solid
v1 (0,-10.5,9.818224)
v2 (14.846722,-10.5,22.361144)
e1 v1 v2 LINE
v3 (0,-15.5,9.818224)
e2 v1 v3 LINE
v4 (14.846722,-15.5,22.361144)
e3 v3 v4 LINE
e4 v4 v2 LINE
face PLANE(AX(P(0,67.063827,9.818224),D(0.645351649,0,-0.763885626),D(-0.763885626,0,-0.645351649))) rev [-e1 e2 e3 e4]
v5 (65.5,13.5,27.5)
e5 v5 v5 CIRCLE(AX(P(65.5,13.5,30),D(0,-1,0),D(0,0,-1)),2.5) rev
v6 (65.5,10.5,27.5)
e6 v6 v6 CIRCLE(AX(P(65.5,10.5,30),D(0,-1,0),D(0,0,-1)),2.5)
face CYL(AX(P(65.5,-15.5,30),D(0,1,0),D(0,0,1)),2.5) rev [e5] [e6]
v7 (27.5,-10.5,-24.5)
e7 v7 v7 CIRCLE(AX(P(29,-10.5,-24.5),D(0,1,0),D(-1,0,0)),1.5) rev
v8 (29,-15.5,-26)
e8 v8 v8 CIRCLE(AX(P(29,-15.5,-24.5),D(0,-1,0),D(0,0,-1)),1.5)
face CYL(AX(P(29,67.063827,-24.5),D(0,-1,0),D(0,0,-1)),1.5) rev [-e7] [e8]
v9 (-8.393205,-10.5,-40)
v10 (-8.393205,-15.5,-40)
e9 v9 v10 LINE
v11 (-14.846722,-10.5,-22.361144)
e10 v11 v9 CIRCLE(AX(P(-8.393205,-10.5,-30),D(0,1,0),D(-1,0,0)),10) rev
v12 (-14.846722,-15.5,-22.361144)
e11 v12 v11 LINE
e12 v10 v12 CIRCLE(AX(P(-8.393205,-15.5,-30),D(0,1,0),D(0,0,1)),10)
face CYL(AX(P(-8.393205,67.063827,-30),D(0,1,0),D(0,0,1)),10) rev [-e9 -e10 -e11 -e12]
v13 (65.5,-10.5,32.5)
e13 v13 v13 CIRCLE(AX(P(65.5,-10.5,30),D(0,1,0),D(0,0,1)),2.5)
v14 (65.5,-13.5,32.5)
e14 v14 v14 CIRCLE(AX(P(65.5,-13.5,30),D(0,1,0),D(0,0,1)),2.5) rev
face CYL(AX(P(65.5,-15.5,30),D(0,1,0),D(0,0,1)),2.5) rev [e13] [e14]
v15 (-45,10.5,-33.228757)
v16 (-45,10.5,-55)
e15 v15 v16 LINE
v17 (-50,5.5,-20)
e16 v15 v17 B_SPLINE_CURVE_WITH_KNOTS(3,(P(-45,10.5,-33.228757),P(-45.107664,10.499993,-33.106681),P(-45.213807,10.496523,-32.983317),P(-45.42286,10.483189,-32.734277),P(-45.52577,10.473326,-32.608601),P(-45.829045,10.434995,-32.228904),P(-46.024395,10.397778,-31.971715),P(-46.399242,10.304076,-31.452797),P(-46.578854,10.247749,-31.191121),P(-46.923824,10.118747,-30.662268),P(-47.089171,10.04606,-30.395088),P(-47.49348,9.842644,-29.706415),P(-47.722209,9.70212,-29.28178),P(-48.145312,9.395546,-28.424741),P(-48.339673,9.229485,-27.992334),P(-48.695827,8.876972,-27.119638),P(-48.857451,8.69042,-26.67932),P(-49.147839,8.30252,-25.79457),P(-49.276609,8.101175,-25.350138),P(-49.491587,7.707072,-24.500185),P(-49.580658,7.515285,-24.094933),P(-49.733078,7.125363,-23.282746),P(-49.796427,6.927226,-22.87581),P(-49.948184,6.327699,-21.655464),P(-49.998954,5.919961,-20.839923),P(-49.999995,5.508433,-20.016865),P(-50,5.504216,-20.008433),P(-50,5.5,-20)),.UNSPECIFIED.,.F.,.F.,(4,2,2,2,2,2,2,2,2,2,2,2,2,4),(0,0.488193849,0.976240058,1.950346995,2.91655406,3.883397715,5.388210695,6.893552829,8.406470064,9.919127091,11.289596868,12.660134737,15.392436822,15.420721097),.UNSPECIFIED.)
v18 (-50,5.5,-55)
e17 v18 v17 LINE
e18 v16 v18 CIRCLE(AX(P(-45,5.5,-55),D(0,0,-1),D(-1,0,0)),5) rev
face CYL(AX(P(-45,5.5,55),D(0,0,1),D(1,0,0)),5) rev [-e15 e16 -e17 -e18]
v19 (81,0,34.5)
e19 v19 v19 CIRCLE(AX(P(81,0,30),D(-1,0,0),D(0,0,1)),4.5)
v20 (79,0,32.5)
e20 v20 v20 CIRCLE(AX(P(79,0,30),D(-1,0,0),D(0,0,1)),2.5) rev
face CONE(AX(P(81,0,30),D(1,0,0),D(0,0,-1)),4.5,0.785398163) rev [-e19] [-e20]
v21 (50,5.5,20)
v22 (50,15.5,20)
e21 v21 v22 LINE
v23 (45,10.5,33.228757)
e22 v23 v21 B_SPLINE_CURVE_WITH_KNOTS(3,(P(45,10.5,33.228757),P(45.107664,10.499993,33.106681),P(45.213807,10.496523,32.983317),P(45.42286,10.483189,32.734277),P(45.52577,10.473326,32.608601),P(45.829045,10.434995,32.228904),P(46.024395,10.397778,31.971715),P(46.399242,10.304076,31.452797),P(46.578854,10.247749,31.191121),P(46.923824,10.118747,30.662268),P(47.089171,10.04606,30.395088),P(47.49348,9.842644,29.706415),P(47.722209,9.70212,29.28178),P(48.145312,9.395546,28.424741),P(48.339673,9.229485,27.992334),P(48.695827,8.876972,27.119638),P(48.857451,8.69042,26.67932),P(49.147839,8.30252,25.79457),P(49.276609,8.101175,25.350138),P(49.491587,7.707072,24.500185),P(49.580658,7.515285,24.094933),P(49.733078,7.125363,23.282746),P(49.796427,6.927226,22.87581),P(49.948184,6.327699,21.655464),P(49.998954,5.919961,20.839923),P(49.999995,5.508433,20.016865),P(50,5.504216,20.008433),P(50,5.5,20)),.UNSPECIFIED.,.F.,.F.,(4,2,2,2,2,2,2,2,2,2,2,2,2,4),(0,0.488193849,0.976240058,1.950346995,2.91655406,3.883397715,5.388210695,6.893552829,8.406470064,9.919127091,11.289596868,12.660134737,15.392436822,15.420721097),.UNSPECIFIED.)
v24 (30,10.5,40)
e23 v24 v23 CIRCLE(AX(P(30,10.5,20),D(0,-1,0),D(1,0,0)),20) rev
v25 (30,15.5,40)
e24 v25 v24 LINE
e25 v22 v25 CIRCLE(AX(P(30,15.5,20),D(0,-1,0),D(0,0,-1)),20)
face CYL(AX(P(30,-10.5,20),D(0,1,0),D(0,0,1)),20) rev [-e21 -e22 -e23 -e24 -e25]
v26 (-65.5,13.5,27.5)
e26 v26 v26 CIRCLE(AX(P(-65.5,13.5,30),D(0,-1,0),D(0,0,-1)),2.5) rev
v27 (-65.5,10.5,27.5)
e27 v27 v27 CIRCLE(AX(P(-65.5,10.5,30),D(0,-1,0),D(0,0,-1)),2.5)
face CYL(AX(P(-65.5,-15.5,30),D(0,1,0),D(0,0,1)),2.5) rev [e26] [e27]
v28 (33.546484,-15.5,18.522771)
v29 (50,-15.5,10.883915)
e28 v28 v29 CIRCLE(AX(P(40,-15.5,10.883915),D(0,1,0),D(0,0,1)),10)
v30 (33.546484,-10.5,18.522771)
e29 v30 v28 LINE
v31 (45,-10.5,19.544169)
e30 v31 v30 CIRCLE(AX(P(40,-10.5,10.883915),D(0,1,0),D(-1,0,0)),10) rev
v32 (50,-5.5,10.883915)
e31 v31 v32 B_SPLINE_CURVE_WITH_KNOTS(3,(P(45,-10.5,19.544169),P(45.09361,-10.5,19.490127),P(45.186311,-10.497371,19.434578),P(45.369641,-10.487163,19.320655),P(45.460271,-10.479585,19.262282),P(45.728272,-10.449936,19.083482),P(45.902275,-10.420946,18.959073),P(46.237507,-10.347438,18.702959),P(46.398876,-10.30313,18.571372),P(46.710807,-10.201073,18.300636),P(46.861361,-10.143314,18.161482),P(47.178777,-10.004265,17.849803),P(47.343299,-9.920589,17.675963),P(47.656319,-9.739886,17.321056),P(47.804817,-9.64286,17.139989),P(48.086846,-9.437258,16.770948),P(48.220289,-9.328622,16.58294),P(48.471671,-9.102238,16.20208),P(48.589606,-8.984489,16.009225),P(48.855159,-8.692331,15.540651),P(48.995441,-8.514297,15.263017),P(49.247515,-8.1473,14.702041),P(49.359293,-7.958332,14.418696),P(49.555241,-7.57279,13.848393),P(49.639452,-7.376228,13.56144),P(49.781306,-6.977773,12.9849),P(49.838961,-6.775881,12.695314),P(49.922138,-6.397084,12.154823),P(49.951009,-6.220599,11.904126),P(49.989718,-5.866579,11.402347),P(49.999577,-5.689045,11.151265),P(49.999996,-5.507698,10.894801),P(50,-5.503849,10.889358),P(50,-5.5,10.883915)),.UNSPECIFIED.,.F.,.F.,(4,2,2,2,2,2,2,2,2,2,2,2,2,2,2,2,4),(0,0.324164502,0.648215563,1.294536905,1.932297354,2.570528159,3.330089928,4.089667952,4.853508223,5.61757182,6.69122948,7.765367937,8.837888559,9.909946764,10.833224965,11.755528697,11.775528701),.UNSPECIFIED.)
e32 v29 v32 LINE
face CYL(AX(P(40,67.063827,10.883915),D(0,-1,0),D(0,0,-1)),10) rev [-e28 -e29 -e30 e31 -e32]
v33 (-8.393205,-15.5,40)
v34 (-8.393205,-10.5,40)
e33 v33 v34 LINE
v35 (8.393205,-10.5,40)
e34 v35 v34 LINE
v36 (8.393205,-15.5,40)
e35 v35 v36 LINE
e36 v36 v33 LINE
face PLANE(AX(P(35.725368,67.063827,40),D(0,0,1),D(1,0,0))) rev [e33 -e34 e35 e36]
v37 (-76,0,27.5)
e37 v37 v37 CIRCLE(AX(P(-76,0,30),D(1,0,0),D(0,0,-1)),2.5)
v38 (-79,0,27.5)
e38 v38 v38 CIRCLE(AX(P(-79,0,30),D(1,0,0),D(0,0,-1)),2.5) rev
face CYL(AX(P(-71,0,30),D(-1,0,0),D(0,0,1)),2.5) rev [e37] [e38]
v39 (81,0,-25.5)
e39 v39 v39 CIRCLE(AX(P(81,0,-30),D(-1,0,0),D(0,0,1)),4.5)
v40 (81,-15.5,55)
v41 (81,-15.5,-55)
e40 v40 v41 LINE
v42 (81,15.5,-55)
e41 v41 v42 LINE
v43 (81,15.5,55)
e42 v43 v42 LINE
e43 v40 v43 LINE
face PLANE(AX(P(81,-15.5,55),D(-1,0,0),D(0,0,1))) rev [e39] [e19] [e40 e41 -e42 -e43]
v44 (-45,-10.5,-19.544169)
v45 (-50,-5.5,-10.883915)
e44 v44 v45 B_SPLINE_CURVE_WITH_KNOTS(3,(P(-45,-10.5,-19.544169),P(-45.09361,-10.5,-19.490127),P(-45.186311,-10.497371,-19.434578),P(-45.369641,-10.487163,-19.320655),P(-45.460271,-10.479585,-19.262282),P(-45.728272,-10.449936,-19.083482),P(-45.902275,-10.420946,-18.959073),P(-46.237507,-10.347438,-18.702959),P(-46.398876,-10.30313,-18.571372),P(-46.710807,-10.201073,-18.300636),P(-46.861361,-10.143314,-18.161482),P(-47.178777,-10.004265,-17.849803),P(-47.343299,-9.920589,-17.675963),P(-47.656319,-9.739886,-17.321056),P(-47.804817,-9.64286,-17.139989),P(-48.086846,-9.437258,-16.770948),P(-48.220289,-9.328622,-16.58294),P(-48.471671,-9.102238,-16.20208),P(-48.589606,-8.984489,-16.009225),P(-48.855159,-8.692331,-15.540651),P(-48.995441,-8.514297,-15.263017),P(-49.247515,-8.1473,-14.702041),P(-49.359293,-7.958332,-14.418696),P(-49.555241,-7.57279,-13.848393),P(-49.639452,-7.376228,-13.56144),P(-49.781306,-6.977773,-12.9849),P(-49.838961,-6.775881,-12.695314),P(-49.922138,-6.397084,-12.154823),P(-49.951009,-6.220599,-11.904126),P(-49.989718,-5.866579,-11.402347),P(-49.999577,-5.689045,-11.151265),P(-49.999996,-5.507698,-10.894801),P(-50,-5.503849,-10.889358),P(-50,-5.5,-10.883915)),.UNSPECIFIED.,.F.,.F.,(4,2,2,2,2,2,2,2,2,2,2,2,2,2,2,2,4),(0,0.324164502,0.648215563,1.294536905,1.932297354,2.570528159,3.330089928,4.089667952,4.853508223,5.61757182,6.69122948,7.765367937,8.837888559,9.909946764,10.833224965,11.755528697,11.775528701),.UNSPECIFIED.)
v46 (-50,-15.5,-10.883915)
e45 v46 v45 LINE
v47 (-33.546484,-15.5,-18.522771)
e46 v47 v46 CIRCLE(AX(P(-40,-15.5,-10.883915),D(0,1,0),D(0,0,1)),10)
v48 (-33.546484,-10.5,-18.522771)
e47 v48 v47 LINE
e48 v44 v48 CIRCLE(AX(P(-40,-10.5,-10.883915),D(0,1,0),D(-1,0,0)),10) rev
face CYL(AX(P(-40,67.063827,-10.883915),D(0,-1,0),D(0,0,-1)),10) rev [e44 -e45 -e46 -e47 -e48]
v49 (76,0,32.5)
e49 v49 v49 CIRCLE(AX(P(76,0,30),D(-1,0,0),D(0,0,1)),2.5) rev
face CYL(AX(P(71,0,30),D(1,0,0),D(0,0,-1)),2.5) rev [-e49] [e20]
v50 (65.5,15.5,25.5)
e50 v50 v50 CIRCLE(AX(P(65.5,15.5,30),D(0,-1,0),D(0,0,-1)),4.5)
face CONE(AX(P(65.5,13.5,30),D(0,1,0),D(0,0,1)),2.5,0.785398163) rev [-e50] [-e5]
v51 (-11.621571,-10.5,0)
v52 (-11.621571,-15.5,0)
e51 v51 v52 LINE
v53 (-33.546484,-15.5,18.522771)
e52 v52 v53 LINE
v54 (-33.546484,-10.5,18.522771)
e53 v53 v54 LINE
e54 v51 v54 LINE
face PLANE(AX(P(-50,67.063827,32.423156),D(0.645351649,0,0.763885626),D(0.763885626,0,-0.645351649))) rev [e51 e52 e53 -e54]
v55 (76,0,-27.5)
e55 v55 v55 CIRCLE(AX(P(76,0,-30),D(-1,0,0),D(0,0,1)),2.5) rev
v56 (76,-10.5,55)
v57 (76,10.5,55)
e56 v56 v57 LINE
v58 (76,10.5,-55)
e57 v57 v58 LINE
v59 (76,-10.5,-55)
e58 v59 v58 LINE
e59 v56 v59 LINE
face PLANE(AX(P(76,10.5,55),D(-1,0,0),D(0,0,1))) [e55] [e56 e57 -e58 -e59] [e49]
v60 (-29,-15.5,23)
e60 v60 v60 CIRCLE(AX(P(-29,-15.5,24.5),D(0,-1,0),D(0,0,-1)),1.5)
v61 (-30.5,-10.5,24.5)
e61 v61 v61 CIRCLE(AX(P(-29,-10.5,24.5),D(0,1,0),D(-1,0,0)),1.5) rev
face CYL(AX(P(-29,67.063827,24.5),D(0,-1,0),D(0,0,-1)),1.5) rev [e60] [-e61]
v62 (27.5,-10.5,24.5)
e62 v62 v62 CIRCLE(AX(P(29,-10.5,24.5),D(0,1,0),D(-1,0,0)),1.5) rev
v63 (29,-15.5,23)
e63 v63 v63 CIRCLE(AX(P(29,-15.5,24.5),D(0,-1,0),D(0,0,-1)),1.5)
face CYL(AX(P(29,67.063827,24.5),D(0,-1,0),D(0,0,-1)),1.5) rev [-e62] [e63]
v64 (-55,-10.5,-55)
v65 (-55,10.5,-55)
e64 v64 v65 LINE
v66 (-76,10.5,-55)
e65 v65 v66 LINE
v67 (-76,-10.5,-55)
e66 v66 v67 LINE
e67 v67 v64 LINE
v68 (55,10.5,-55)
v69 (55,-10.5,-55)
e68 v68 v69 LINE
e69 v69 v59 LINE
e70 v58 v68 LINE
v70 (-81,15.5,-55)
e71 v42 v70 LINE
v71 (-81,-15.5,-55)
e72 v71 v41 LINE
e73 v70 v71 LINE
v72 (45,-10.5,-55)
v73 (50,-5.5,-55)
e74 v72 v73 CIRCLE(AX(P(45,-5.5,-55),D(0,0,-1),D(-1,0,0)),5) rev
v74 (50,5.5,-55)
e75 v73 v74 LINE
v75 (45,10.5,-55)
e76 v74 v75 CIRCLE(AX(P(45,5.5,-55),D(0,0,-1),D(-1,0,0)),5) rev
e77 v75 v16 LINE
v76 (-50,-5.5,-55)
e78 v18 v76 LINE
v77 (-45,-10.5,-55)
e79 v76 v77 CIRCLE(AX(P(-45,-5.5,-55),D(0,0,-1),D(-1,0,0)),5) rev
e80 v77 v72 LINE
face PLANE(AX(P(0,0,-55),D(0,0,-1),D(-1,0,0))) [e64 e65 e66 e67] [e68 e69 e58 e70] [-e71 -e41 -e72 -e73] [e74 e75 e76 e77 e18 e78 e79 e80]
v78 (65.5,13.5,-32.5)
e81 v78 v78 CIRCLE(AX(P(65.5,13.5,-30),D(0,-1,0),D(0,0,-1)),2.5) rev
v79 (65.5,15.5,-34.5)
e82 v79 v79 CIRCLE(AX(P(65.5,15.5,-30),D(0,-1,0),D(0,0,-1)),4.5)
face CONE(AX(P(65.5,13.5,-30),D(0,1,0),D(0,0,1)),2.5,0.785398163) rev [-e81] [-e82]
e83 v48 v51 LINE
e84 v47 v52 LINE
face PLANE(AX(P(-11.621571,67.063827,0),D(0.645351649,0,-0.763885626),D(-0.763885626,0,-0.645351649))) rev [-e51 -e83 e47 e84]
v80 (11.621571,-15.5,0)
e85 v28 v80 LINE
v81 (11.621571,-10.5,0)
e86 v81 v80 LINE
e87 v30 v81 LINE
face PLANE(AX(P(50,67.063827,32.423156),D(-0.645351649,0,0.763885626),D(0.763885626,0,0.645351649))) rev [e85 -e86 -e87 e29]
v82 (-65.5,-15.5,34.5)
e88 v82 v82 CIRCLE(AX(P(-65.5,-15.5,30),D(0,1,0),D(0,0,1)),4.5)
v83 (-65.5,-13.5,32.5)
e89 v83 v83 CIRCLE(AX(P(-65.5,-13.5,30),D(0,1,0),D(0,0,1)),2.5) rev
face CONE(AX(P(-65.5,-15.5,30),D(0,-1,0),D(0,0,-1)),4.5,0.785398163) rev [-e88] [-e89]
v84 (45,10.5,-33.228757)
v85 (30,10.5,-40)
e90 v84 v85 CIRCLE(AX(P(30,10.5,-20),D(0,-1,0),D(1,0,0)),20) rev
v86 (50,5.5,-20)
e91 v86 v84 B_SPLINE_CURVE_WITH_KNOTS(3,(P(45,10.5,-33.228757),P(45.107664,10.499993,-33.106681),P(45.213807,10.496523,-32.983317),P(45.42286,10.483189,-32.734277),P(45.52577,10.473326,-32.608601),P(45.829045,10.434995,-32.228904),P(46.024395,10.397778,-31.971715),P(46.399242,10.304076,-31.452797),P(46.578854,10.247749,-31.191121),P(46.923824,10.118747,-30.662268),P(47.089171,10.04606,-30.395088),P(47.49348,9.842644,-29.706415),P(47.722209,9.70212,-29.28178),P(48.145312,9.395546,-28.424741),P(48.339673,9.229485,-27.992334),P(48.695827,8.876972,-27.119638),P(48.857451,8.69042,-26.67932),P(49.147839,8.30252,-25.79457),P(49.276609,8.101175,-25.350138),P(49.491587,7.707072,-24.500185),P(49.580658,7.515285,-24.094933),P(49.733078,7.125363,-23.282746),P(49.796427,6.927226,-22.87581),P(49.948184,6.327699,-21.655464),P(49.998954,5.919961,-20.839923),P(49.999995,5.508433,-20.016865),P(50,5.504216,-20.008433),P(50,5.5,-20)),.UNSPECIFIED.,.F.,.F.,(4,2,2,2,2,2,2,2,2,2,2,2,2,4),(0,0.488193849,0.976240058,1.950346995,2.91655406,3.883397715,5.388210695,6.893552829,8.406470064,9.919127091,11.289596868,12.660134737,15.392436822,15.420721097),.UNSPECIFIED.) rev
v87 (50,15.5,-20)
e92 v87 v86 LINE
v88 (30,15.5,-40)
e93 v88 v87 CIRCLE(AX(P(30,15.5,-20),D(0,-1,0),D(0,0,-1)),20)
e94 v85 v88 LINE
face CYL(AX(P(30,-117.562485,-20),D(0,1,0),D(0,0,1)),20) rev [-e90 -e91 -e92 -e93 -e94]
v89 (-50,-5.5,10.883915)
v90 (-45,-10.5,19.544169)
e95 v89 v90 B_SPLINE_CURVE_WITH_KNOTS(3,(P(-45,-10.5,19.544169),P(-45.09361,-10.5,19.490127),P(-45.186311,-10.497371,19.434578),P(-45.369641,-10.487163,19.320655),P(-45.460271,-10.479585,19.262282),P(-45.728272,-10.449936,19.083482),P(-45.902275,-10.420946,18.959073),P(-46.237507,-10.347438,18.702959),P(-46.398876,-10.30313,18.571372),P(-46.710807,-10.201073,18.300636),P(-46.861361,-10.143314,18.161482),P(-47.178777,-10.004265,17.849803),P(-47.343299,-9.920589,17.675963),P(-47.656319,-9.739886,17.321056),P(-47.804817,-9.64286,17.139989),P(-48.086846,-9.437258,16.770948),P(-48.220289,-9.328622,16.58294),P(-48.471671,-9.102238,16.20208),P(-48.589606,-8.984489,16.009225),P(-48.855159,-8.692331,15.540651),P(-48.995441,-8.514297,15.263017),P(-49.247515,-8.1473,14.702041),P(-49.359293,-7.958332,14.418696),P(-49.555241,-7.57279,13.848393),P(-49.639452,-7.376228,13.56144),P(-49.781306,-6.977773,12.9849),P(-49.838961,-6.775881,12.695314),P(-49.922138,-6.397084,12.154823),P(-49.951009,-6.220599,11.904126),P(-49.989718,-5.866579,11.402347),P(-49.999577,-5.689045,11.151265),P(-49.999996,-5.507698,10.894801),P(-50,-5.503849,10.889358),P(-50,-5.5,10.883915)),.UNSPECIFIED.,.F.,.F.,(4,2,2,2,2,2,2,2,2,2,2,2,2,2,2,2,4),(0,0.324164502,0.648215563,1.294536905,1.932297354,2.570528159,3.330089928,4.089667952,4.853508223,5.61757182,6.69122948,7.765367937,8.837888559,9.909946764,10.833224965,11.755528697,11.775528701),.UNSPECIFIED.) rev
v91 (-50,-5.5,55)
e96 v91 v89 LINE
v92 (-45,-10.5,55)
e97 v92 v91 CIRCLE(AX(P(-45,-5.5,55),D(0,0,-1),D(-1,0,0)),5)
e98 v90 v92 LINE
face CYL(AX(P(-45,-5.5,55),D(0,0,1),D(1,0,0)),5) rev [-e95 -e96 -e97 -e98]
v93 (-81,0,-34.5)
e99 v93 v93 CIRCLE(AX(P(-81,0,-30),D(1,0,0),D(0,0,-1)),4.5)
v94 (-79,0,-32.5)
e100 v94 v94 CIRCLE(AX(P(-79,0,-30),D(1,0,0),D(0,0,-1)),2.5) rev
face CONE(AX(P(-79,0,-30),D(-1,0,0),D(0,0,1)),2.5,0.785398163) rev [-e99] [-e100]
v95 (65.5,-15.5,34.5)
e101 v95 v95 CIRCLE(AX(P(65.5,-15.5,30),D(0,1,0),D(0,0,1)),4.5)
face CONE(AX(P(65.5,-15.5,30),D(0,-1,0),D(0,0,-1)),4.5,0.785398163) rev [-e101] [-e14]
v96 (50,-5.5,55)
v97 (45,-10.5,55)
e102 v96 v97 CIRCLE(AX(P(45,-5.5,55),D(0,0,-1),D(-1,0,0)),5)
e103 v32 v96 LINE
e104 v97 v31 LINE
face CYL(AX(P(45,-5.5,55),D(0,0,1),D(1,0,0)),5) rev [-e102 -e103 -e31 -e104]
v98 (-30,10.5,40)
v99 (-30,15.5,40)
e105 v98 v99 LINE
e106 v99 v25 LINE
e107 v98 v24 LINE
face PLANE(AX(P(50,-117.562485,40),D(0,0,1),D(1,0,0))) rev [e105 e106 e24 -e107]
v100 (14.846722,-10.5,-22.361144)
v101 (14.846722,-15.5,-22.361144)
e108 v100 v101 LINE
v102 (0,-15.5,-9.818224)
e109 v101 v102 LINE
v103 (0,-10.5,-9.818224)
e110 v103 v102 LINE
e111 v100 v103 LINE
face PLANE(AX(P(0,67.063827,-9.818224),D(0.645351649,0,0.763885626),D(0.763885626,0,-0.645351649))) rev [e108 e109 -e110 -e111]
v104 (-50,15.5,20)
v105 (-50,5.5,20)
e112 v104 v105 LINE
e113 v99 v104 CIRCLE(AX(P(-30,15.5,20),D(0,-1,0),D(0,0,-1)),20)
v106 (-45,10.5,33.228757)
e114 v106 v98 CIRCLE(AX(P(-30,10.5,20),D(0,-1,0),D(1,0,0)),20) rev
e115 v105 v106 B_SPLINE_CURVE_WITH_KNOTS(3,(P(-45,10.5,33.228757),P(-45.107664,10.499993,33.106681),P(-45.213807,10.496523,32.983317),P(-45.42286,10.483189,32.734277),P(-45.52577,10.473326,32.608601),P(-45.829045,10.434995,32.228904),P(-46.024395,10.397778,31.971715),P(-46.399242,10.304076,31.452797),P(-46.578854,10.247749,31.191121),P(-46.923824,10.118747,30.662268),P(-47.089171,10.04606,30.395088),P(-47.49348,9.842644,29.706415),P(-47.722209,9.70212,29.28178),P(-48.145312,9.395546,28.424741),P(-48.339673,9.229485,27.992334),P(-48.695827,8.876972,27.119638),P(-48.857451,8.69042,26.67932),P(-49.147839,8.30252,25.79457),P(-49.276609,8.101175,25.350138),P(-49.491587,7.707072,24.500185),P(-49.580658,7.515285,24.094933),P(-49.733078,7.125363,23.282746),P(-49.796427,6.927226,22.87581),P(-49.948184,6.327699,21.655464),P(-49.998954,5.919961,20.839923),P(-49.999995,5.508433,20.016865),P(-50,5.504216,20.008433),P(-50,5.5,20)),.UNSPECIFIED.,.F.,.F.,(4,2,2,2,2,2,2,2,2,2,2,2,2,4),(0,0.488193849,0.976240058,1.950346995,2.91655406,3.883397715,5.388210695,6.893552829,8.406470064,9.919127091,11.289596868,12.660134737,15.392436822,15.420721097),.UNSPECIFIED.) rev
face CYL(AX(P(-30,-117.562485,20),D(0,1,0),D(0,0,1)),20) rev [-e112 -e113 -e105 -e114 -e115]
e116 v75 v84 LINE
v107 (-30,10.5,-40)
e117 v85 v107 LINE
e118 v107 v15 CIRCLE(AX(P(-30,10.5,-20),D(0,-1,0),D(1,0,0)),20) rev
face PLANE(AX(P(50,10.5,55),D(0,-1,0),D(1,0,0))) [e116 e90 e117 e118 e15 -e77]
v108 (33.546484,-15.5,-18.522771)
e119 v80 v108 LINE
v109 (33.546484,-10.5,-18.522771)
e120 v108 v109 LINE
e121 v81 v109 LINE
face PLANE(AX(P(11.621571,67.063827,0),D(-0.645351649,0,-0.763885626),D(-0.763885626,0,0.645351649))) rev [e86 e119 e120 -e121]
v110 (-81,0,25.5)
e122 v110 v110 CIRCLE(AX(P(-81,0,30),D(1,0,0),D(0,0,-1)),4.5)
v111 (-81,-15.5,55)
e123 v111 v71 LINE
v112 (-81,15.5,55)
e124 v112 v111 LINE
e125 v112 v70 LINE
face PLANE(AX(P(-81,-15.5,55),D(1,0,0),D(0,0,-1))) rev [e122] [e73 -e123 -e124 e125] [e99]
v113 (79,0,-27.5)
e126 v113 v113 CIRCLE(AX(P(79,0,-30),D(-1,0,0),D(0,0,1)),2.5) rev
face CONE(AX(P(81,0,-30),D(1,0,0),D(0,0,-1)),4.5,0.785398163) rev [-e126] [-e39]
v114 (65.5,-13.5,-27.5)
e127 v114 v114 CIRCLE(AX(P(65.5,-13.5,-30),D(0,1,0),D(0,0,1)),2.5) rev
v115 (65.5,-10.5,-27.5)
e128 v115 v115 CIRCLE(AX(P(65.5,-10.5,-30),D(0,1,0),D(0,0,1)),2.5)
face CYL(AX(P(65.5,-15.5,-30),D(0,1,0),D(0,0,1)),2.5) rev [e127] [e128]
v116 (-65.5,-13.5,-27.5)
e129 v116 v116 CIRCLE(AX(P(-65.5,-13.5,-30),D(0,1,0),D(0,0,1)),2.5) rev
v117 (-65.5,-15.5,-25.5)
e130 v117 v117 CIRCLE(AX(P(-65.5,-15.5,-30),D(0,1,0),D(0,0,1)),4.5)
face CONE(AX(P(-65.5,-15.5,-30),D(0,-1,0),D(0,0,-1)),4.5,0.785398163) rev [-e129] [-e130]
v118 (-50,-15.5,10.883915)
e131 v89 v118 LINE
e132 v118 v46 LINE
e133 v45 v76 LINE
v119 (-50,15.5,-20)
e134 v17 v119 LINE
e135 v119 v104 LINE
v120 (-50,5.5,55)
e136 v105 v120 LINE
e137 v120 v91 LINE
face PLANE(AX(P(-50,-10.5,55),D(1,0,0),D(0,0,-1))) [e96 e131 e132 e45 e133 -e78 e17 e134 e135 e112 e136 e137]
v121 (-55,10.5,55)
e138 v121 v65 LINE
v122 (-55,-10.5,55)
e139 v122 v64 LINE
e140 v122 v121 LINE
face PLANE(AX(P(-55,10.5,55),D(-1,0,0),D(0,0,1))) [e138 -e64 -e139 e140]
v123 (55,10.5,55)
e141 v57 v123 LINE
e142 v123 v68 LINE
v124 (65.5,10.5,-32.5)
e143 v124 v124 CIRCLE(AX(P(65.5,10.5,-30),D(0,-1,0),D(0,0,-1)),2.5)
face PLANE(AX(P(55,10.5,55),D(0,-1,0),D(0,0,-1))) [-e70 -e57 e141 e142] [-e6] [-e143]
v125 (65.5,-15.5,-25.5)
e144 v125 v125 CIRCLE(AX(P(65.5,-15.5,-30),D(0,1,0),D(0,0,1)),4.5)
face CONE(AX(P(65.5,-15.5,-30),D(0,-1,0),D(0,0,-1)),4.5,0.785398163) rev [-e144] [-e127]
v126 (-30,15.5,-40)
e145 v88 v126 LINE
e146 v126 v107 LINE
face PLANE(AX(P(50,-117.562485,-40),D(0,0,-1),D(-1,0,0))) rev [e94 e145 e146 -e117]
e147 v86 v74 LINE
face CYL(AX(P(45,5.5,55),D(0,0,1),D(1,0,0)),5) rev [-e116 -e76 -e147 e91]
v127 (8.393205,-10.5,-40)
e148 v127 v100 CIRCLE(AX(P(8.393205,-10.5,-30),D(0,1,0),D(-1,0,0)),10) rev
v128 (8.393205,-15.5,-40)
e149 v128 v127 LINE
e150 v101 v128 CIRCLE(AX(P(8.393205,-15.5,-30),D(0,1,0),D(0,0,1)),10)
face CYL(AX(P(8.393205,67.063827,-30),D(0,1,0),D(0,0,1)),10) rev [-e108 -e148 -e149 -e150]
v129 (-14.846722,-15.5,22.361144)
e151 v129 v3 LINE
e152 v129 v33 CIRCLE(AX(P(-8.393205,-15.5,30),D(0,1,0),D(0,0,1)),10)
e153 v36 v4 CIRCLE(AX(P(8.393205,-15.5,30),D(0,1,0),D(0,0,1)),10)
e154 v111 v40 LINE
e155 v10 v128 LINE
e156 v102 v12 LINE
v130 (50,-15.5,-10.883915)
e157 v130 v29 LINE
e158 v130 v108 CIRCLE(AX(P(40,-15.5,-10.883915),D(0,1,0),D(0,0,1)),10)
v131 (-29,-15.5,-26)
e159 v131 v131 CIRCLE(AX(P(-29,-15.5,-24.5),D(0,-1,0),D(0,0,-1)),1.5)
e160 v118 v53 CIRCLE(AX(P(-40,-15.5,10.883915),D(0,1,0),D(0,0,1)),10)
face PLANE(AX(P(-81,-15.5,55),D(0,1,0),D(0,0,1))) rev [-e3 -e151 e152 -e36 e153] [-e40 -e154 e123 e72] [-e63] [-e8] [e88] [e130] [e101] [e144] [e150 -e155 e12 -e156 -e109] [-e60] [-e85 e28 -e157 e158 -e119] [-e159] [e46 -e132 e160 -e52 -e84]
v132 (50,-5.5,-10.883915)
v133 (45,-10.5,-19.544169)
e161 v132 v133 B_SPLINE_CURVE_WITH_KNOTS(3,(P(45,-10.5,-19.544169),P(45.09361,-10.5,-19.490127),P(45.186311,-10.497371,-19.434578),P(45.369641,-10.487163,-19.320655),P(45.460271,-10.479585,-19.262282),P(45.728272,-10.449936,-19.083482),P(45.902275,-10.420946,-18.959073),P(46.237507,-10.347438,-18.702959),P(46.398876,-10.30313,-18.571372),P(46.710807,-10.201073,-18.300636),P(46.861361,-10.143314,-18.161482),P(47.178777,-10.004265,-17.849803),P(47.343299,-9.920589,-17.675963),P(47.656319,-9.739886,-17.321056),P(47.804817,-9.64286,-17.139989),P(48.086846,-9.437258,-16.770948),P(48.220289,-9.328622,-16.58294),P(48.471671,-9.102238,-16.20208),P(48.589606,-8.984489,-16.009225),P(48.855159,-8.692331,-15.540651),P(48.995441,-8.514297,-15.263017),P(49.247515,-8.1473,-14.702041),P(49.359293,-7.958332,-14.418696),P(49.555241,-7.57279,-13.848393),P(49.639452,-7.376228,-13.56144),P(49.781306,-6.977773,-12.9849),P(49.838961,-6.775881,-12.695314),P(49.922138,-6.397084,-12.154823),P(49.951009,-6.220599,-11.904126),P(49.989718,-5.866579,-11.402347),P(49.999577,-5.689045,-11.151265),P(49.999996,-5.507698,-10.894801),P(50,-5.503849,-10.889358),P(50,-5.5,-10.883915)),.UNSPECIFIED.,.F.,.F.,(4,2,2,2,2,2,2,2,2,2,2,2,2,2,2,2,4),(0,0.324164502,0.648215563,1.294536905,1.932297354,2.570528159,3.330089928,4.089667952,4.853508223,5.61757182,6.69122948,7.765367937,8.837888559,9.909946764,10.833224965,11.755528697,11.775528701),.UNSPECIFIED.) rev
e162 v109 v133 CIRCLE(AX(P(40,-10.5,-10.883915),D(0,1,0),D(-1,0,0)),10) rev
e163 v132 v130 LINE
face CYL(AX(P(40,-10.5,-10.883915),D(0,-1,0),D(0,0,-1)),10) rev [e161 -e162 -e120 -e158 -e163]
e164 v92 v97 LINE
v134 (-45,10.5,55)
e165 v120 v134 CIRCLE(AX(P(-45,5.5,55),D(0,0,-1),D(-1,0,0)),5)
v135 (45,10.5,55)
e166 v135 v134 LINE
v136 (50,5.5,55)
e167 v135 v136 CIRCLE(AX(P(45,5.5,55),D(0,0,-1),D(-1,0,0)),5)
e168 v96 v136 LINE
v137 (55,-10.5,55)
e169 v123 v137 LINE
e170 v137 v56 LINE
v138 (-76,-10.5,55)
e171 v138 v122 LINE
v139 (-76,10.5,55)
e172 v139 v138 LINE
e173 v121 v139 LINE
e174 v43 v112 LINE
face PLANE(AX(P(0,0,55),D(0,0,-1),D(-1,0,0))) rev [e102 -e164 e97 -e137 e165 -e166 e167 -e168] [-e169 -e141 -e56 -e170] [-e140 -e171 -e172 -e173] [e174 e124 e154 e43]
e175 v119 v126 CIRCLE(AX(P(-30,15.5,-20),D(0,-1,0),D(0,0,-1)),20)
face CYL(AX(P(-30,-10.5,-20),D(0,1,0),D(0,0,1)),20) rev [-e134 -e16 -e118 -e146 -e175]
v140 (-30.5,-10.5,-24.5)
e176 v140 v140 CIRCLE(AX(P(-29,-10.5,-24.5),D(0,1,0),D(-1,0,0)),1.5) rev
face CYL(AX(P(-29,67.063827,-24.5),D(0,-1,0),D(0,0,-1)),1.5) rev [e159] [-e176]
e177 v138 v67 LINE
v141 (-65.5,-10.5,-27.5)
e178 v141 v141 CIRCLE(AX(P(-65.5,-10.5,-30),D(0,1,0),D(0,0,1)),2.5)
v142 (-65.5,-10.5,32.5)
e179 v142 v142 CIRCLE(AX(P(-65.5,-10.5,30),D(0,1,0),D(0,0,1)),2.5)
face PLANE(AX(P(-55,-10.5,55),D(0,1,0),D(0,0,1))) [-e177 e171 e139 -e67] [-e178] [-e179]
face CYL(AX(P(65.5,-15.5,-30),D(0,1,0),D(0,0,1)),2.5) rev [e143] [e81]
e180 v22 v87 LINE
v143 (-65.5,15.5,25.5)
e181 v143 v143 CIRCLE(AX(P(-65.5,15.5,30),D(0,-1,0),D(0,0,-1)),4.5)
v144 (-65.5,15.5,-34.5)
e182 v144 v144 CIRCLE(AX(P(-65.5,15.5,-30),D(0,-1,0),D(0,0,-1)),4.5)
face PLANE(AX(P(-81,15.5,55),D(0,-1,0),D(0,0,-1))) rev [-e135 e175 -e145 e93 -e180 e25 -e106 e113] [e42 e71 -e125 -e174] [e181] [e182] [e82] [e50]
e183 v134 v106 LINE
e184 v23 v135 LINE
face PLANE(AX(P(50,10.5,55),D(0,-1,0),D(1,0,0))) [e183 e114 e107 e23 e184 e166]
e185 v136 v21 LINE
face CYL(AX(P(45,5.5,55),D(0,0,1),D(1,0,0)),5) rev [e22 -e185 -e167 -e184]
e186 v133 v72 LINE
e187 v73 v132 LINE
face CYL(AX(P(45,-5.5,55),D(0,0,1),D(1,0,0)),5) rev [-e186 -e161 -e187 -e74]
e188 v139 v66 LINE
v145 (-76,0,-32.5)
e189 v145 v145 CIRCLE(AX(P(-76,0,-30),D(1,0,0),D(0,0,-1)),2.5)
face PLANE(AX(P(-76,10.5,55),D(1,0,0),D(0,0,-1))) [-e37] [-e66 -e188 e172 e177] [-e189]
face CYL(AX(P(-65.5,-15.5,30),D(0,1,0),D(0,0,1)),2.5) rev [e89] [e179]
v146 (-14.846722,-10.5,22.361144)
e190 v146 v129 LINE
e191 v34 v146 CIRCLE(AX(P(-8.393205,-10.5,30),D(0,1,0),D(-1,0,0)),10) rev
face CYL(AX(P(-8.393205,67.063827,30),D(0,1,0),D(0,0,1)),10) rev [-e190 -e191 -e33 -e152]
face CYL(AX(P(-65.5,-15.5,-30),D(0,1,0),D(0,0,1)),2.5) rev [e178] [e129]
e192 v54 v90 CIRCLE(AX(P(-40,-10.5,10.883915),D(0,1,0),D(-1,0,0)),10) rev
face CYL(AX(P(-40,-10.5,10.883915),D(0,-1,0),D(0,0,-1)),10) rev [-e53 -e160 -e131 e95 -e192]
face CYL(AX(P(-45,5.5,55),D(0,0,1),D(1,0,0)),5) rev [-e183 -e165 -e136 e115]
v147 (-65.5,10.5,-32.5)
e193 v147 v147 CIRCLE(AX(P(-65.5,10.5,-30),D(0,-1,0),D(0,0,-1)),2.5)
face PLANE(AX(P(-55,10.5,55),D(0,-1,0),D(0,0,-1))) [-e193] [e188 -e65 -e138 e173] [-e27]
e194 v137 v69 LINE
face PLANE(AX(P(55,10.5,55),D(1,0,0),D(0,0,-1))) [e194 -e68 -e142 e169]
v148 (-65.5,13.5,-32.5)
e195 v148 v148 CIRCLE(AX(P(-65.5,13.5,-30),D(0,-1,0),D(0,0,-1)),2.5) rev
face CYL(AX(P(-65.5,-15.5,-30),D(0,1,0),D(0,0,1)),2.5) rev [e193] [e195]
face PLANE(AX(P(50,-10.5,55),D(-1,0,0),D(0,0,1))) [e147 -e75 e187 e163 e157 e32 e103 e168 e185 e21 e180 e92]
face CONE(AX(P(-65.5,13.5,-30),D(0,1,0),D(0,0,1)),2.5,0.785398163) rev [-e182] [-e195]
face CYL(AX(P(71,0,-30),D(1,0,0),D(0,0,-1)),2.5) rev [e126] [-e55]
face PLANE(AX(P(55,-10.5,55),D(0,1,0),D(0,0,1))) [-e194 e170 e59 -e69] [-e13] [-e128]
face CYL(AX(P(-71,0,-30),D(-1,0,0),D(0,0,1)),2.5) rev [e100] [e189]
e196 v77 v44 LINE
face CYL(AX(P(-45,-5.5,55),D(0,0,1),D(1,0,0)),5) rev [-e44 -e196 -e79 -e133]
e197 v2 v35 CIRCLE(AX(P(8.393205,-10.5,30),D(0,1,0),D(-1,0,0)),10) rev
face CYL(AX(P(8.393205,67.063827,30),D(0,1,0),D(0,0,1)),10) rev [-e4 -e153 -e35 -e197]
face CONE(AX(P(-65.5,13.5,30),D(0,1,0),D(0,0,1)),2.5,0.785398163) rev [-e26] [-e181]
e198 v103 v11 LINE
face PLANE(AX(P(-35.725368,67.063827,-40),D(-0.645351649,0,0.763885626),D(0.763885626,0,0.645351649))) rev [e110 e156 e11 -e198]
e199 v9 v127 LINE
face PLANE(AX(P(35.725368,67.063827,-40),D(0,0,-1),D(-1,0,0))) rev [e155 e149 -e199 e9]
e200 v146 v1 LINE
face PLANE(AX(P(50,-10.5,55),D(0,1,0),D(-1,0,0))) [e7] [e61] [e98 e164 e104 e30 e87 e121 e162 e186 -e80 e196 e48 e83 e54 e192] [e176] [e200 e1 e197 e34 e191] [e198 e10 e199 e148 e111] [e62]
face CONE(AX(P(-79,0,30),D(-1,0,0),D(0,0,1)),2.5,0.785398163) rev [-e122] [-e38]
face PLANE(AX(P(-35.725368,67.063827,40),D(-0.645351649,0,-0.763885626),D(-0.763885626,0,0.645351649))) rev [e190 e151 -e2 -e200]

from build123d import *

# Parameters (mm, degrees)
SKETCH1_W           = 162
SKETCH1_H           = 31
SKETCH1_W_2         = 21
SKETCH1_H_2         = 21
SKETCH1_W_3         = 100
BOSS_EXTRUDE1_DEPTH = 55
SKETCH2_R           = 1.5
CUT_EXTRUDE1_DEPTH  = 5
SKETCH3_W           = 100
SKETCH3_H           = 80
CUT_EXTRUDE2_DEPTH  = 5
FILLET1_R           = 10
FILLET3_R           = 5
SKETCH4_R           = 2.5
CUT_EXTRUDE3_DEPTH  = 103.698588195
SKETCH5_R           = 2.5
CUT_EXTRUDE4_DEPTH  = 10
CHAMFER1_SIZE       = 2
FILLET4_START       = -40
FILLET4_DEPTH       = 20.0000001
FILLET4_START_2     = 19.9999999
FILLET4_2_DEPTH     = 20.0000001
FILLET4_START_3     = 4
FILLET4_3_DEPTH     = 11.5


with BuildPart() as part:
    # Sketch1 → Boss-Extrude1 (new, symmetric)
    with BuildSketch(Plane.XY):
        Rectangle(SKETCH1_W, SKETCH1_H)
        with Locations((65.5, 0)):
            Rectangle(SKETCH1_W_2, SKETCH1_H_2, mode=Mode.SUBTRACT)
        with Locations((-65.5, 0)):
            Rectangle(SKETCH1_W_2, SKETCH1_H_2, mode=Mode.SUBTRACT)
        Rectangle(SKETCH1_W_3, SKETCH1_H_2, mode=Mode.SUBTRACT)
    extrude(amount=BOSS_EXTRUDE1_DEPTH, both=True)

    # Sketch2 → Cut-Extrude1 (cut)
    with BuildSketch(Plane.XZ.offset(15.5)):
        with Locations(Location((29, -24.5, 0), (0, 0, 270))):
            Circle(SKETCH2_R)
        with Locations(Location((-29, -24.5, 0), (0, 0, 270))):
            Circle(SKETCH2_R)
        with Locations(Location((29, 24.5, 0), (0, 0, 270))):
            Circle(SKETCH2_R)
        with Locations(Location((-29, 24.5, 0), (0, 0, 270))):
            Circle(SKETCH2_R)
        Polygon((-50, -32.423155549), (-50, 32.423155549), (-11.621570983, 0), align=None)
        Polygon((-35.725367792, 40), (0, 9.818223762), (35.725367792, 40), align=None)
        Polygon((50, 32.423155549), (11.621570983, 0), (50, -32.423155549), align=None)
        Polygon((-35.725367792, -40), (0, -9.818223762), (35.725367792, -40), align=None)
    extrude(amount=-CUT_EXTRUDE1_DEPTH, mode=Mode.SUBTRACT)

    # Sketch3 → Cut-Extrude2 (cut)
    with BuildSketch(Plane(origin=(0, 15.5, 0), x_dir=(1, 0, 0), z_dir=(0, 1, 0))):
        Rectangle(SKETCH3_W, SKETCH3_H)
    extrude(amount=-CUT_EXTRUDE2_DEPTH, mode=Mode.SUBTRACT)

    # Fillet1
    fillet1_edges = [part.edges().sort_by_distance(p)[0] for p in [
        (-35.725367792, -13, -40),
        (35.725367792, -13, -40),
        (35.725367792, -13, 40),
        (-35.725367792, -13, 40),
        (50, -13, -32.423155549),
        (50, -13, 32.423155549),
        (-50, -13, 32.423155549),
        (-50, -13, -32.423155549),
    ]]
    fillet(fillet1_edges, radius=FILLET1_R)

    # Fillet3
    fillet3_edges = [part.edges().sort_by_distance(p)[0] for p in [
        (50, 10.5, -47.5),
        (-50, 10.5, -47.5),
        (-50, 10.5, 47.5),
        (-50, -10.5, 32.941957335),
        (50, -10.5, 32.941957335),
        (50, 10.5, 47.5),
        (50, -10.5, -32.941957335),
        (-50, -10.5, -32.941957335),
    ]]
    fillet(fillet3_edges, radius=FILLET3_R)

    # Sketch4 → Cut-Extrude3 (cut, through all)
    with BuildSketch(Plane(origin=(0, 15.5, 0), x_dir=(1, 0, 0), z_dir=(0, 1, 0))):
        with Locations(Location((65.5, 30, 0), (0, 0, 270))):
            Circle(SKETCH4_R)
        with Locations(Location((65.5, -30, 0), (0, 0, 270))):
            Circle(SKETCH4_R)
        with Locations(Location((-65.5, 30, 0), (0, 0, 270))):
            Circle(SKETCH4_R)
        with Locations(Location((-65.5, -30, 0), (0, 0, 270))):
            Circle(SKETCH4_R)
    extrude(amount=-CUT_EXTRUDE3_DEPTH, mode=Mode.SUBTRACT)

    # Sketch5 → Cut-Extrude4 (cut)
    with BuildSketch(Plane.ZY.offset(81)):
        with Locations((30, 0)):
            Circle(SKETCH5_R)
        with Locations((-30, 0)):
            Circle(SKETCH5_R)
    cut_extrude4 = extrude(amount=-CUT_EXTRUDE4_DEPTH, mode=Mode.SUBTRACT)

    # Mirror1: Cut-Extrude4 across plane
    add(cut_extrude4.mirror(Plane(origin=(0, 0, 0), x_dir=(0, 0, 1), z_dir=(1, 0, 0))), mode=Mode.SUBTRACT)

    # Chamfer1
    chamfer1_edges = [part.edges().sort_by_distance(p)[0] for p in [
        (65.5, -15.5, 27.5),
        (65.5, 15.5, 27.5),
        (-65.5, -15.5, -32.5),
        (-65.5, 15.5, -32.5),
        (-65.5, -15.5, 27.5),
        (-65.5, 15.5, 27.5),
        (65.5, -15.5, -32.5),
        (65.5, 15.5, -32.5),
        (-81, 0, 27.5),
        (-81, 0, -32.5),
        (81, 0, 27.5),
        (81, 0, -32.5),
    ]]
    chamfer(chamfer1_edges, length=CHAMFER1_SIZE)

    # Fillet4: read off the stored shape, not the designer's step
    # Fillet4 outline → Fillet4 (add)
    with BuildSketch(Plane.XY.offset(FILLET4_START)):
        with BuildLine():
            ThreePointArc((-50, 5.5), (-48.535533906, 9.035533906), (-45, 10.5))
            Line((-45, 10.5), (45, 10.5))
            ThreePointArc((45, 10.5), (48.535533906, 9.035533906), (50, 5.5))
            Line((50, 5.5), (50, 15.5))
            Line((50, 15.5), (-50, 15.5))
            Line((-50, 15.5), (-50, 5.5))
        make_face()
    extrude(amount=FILLET4_DEPTH)

    # Fillet4 2 outline → Fillet4 2 (add)
    with BuildSketch(Plane.XY.offset(FILLET4_START_2)):
        with BuildLine():
            ThreePointArc((-50, 5.5), (-48.535533906, 9.035533906), (-45, 10.5))
            Line((-45, 10.5), (45, 10.5))
            ThreePointArc((45, 10.5), (48.535533906, 9.035533906), (50, 5.5))
            Line((50, 5.5), (50, 15.5))
            Line((50, 15.5), (-50, 15.5))
            Line((-50, 15.5), (-50, 5.5))
        make_face()
    extrude(amount=FILLET4_2_DEPTH)

    # Fillet4 3 outline → Fillet4 3 (cut)
    with BuildSketch(Plane(origin=(0, 0, 0), x_dir=(1, 0, 0), z_dir=(0, 1, 0)).offset(FILLET4_START_3)):
        with BuildLine():
            ThreePointArc((-50, -20), (-44.142135624, -34.142135624), (-30, -40))
            Line((-30, -40), (30, -40))
            ThreePointArc((30, -40), (44.142135624, -34.142135624), (50, -20))
            Line((50, -20), (-50, -20))
        make_face()
        with BuildLine():
            ThreePointArc((50, 20), (44.142135624, 34.142135624), (30, 40))
            Line((30, 40), (-30, 40))
            ThreePointArc((-30, 40), (-44.142135624, 34.142135624), (-50, 20))
            Line((-50, 20), (50, 20))
        make_face()
    extrude(amount=FILLET4_3_DEPTH, mode=Mode.SUBTRACT)


solid = part.part
